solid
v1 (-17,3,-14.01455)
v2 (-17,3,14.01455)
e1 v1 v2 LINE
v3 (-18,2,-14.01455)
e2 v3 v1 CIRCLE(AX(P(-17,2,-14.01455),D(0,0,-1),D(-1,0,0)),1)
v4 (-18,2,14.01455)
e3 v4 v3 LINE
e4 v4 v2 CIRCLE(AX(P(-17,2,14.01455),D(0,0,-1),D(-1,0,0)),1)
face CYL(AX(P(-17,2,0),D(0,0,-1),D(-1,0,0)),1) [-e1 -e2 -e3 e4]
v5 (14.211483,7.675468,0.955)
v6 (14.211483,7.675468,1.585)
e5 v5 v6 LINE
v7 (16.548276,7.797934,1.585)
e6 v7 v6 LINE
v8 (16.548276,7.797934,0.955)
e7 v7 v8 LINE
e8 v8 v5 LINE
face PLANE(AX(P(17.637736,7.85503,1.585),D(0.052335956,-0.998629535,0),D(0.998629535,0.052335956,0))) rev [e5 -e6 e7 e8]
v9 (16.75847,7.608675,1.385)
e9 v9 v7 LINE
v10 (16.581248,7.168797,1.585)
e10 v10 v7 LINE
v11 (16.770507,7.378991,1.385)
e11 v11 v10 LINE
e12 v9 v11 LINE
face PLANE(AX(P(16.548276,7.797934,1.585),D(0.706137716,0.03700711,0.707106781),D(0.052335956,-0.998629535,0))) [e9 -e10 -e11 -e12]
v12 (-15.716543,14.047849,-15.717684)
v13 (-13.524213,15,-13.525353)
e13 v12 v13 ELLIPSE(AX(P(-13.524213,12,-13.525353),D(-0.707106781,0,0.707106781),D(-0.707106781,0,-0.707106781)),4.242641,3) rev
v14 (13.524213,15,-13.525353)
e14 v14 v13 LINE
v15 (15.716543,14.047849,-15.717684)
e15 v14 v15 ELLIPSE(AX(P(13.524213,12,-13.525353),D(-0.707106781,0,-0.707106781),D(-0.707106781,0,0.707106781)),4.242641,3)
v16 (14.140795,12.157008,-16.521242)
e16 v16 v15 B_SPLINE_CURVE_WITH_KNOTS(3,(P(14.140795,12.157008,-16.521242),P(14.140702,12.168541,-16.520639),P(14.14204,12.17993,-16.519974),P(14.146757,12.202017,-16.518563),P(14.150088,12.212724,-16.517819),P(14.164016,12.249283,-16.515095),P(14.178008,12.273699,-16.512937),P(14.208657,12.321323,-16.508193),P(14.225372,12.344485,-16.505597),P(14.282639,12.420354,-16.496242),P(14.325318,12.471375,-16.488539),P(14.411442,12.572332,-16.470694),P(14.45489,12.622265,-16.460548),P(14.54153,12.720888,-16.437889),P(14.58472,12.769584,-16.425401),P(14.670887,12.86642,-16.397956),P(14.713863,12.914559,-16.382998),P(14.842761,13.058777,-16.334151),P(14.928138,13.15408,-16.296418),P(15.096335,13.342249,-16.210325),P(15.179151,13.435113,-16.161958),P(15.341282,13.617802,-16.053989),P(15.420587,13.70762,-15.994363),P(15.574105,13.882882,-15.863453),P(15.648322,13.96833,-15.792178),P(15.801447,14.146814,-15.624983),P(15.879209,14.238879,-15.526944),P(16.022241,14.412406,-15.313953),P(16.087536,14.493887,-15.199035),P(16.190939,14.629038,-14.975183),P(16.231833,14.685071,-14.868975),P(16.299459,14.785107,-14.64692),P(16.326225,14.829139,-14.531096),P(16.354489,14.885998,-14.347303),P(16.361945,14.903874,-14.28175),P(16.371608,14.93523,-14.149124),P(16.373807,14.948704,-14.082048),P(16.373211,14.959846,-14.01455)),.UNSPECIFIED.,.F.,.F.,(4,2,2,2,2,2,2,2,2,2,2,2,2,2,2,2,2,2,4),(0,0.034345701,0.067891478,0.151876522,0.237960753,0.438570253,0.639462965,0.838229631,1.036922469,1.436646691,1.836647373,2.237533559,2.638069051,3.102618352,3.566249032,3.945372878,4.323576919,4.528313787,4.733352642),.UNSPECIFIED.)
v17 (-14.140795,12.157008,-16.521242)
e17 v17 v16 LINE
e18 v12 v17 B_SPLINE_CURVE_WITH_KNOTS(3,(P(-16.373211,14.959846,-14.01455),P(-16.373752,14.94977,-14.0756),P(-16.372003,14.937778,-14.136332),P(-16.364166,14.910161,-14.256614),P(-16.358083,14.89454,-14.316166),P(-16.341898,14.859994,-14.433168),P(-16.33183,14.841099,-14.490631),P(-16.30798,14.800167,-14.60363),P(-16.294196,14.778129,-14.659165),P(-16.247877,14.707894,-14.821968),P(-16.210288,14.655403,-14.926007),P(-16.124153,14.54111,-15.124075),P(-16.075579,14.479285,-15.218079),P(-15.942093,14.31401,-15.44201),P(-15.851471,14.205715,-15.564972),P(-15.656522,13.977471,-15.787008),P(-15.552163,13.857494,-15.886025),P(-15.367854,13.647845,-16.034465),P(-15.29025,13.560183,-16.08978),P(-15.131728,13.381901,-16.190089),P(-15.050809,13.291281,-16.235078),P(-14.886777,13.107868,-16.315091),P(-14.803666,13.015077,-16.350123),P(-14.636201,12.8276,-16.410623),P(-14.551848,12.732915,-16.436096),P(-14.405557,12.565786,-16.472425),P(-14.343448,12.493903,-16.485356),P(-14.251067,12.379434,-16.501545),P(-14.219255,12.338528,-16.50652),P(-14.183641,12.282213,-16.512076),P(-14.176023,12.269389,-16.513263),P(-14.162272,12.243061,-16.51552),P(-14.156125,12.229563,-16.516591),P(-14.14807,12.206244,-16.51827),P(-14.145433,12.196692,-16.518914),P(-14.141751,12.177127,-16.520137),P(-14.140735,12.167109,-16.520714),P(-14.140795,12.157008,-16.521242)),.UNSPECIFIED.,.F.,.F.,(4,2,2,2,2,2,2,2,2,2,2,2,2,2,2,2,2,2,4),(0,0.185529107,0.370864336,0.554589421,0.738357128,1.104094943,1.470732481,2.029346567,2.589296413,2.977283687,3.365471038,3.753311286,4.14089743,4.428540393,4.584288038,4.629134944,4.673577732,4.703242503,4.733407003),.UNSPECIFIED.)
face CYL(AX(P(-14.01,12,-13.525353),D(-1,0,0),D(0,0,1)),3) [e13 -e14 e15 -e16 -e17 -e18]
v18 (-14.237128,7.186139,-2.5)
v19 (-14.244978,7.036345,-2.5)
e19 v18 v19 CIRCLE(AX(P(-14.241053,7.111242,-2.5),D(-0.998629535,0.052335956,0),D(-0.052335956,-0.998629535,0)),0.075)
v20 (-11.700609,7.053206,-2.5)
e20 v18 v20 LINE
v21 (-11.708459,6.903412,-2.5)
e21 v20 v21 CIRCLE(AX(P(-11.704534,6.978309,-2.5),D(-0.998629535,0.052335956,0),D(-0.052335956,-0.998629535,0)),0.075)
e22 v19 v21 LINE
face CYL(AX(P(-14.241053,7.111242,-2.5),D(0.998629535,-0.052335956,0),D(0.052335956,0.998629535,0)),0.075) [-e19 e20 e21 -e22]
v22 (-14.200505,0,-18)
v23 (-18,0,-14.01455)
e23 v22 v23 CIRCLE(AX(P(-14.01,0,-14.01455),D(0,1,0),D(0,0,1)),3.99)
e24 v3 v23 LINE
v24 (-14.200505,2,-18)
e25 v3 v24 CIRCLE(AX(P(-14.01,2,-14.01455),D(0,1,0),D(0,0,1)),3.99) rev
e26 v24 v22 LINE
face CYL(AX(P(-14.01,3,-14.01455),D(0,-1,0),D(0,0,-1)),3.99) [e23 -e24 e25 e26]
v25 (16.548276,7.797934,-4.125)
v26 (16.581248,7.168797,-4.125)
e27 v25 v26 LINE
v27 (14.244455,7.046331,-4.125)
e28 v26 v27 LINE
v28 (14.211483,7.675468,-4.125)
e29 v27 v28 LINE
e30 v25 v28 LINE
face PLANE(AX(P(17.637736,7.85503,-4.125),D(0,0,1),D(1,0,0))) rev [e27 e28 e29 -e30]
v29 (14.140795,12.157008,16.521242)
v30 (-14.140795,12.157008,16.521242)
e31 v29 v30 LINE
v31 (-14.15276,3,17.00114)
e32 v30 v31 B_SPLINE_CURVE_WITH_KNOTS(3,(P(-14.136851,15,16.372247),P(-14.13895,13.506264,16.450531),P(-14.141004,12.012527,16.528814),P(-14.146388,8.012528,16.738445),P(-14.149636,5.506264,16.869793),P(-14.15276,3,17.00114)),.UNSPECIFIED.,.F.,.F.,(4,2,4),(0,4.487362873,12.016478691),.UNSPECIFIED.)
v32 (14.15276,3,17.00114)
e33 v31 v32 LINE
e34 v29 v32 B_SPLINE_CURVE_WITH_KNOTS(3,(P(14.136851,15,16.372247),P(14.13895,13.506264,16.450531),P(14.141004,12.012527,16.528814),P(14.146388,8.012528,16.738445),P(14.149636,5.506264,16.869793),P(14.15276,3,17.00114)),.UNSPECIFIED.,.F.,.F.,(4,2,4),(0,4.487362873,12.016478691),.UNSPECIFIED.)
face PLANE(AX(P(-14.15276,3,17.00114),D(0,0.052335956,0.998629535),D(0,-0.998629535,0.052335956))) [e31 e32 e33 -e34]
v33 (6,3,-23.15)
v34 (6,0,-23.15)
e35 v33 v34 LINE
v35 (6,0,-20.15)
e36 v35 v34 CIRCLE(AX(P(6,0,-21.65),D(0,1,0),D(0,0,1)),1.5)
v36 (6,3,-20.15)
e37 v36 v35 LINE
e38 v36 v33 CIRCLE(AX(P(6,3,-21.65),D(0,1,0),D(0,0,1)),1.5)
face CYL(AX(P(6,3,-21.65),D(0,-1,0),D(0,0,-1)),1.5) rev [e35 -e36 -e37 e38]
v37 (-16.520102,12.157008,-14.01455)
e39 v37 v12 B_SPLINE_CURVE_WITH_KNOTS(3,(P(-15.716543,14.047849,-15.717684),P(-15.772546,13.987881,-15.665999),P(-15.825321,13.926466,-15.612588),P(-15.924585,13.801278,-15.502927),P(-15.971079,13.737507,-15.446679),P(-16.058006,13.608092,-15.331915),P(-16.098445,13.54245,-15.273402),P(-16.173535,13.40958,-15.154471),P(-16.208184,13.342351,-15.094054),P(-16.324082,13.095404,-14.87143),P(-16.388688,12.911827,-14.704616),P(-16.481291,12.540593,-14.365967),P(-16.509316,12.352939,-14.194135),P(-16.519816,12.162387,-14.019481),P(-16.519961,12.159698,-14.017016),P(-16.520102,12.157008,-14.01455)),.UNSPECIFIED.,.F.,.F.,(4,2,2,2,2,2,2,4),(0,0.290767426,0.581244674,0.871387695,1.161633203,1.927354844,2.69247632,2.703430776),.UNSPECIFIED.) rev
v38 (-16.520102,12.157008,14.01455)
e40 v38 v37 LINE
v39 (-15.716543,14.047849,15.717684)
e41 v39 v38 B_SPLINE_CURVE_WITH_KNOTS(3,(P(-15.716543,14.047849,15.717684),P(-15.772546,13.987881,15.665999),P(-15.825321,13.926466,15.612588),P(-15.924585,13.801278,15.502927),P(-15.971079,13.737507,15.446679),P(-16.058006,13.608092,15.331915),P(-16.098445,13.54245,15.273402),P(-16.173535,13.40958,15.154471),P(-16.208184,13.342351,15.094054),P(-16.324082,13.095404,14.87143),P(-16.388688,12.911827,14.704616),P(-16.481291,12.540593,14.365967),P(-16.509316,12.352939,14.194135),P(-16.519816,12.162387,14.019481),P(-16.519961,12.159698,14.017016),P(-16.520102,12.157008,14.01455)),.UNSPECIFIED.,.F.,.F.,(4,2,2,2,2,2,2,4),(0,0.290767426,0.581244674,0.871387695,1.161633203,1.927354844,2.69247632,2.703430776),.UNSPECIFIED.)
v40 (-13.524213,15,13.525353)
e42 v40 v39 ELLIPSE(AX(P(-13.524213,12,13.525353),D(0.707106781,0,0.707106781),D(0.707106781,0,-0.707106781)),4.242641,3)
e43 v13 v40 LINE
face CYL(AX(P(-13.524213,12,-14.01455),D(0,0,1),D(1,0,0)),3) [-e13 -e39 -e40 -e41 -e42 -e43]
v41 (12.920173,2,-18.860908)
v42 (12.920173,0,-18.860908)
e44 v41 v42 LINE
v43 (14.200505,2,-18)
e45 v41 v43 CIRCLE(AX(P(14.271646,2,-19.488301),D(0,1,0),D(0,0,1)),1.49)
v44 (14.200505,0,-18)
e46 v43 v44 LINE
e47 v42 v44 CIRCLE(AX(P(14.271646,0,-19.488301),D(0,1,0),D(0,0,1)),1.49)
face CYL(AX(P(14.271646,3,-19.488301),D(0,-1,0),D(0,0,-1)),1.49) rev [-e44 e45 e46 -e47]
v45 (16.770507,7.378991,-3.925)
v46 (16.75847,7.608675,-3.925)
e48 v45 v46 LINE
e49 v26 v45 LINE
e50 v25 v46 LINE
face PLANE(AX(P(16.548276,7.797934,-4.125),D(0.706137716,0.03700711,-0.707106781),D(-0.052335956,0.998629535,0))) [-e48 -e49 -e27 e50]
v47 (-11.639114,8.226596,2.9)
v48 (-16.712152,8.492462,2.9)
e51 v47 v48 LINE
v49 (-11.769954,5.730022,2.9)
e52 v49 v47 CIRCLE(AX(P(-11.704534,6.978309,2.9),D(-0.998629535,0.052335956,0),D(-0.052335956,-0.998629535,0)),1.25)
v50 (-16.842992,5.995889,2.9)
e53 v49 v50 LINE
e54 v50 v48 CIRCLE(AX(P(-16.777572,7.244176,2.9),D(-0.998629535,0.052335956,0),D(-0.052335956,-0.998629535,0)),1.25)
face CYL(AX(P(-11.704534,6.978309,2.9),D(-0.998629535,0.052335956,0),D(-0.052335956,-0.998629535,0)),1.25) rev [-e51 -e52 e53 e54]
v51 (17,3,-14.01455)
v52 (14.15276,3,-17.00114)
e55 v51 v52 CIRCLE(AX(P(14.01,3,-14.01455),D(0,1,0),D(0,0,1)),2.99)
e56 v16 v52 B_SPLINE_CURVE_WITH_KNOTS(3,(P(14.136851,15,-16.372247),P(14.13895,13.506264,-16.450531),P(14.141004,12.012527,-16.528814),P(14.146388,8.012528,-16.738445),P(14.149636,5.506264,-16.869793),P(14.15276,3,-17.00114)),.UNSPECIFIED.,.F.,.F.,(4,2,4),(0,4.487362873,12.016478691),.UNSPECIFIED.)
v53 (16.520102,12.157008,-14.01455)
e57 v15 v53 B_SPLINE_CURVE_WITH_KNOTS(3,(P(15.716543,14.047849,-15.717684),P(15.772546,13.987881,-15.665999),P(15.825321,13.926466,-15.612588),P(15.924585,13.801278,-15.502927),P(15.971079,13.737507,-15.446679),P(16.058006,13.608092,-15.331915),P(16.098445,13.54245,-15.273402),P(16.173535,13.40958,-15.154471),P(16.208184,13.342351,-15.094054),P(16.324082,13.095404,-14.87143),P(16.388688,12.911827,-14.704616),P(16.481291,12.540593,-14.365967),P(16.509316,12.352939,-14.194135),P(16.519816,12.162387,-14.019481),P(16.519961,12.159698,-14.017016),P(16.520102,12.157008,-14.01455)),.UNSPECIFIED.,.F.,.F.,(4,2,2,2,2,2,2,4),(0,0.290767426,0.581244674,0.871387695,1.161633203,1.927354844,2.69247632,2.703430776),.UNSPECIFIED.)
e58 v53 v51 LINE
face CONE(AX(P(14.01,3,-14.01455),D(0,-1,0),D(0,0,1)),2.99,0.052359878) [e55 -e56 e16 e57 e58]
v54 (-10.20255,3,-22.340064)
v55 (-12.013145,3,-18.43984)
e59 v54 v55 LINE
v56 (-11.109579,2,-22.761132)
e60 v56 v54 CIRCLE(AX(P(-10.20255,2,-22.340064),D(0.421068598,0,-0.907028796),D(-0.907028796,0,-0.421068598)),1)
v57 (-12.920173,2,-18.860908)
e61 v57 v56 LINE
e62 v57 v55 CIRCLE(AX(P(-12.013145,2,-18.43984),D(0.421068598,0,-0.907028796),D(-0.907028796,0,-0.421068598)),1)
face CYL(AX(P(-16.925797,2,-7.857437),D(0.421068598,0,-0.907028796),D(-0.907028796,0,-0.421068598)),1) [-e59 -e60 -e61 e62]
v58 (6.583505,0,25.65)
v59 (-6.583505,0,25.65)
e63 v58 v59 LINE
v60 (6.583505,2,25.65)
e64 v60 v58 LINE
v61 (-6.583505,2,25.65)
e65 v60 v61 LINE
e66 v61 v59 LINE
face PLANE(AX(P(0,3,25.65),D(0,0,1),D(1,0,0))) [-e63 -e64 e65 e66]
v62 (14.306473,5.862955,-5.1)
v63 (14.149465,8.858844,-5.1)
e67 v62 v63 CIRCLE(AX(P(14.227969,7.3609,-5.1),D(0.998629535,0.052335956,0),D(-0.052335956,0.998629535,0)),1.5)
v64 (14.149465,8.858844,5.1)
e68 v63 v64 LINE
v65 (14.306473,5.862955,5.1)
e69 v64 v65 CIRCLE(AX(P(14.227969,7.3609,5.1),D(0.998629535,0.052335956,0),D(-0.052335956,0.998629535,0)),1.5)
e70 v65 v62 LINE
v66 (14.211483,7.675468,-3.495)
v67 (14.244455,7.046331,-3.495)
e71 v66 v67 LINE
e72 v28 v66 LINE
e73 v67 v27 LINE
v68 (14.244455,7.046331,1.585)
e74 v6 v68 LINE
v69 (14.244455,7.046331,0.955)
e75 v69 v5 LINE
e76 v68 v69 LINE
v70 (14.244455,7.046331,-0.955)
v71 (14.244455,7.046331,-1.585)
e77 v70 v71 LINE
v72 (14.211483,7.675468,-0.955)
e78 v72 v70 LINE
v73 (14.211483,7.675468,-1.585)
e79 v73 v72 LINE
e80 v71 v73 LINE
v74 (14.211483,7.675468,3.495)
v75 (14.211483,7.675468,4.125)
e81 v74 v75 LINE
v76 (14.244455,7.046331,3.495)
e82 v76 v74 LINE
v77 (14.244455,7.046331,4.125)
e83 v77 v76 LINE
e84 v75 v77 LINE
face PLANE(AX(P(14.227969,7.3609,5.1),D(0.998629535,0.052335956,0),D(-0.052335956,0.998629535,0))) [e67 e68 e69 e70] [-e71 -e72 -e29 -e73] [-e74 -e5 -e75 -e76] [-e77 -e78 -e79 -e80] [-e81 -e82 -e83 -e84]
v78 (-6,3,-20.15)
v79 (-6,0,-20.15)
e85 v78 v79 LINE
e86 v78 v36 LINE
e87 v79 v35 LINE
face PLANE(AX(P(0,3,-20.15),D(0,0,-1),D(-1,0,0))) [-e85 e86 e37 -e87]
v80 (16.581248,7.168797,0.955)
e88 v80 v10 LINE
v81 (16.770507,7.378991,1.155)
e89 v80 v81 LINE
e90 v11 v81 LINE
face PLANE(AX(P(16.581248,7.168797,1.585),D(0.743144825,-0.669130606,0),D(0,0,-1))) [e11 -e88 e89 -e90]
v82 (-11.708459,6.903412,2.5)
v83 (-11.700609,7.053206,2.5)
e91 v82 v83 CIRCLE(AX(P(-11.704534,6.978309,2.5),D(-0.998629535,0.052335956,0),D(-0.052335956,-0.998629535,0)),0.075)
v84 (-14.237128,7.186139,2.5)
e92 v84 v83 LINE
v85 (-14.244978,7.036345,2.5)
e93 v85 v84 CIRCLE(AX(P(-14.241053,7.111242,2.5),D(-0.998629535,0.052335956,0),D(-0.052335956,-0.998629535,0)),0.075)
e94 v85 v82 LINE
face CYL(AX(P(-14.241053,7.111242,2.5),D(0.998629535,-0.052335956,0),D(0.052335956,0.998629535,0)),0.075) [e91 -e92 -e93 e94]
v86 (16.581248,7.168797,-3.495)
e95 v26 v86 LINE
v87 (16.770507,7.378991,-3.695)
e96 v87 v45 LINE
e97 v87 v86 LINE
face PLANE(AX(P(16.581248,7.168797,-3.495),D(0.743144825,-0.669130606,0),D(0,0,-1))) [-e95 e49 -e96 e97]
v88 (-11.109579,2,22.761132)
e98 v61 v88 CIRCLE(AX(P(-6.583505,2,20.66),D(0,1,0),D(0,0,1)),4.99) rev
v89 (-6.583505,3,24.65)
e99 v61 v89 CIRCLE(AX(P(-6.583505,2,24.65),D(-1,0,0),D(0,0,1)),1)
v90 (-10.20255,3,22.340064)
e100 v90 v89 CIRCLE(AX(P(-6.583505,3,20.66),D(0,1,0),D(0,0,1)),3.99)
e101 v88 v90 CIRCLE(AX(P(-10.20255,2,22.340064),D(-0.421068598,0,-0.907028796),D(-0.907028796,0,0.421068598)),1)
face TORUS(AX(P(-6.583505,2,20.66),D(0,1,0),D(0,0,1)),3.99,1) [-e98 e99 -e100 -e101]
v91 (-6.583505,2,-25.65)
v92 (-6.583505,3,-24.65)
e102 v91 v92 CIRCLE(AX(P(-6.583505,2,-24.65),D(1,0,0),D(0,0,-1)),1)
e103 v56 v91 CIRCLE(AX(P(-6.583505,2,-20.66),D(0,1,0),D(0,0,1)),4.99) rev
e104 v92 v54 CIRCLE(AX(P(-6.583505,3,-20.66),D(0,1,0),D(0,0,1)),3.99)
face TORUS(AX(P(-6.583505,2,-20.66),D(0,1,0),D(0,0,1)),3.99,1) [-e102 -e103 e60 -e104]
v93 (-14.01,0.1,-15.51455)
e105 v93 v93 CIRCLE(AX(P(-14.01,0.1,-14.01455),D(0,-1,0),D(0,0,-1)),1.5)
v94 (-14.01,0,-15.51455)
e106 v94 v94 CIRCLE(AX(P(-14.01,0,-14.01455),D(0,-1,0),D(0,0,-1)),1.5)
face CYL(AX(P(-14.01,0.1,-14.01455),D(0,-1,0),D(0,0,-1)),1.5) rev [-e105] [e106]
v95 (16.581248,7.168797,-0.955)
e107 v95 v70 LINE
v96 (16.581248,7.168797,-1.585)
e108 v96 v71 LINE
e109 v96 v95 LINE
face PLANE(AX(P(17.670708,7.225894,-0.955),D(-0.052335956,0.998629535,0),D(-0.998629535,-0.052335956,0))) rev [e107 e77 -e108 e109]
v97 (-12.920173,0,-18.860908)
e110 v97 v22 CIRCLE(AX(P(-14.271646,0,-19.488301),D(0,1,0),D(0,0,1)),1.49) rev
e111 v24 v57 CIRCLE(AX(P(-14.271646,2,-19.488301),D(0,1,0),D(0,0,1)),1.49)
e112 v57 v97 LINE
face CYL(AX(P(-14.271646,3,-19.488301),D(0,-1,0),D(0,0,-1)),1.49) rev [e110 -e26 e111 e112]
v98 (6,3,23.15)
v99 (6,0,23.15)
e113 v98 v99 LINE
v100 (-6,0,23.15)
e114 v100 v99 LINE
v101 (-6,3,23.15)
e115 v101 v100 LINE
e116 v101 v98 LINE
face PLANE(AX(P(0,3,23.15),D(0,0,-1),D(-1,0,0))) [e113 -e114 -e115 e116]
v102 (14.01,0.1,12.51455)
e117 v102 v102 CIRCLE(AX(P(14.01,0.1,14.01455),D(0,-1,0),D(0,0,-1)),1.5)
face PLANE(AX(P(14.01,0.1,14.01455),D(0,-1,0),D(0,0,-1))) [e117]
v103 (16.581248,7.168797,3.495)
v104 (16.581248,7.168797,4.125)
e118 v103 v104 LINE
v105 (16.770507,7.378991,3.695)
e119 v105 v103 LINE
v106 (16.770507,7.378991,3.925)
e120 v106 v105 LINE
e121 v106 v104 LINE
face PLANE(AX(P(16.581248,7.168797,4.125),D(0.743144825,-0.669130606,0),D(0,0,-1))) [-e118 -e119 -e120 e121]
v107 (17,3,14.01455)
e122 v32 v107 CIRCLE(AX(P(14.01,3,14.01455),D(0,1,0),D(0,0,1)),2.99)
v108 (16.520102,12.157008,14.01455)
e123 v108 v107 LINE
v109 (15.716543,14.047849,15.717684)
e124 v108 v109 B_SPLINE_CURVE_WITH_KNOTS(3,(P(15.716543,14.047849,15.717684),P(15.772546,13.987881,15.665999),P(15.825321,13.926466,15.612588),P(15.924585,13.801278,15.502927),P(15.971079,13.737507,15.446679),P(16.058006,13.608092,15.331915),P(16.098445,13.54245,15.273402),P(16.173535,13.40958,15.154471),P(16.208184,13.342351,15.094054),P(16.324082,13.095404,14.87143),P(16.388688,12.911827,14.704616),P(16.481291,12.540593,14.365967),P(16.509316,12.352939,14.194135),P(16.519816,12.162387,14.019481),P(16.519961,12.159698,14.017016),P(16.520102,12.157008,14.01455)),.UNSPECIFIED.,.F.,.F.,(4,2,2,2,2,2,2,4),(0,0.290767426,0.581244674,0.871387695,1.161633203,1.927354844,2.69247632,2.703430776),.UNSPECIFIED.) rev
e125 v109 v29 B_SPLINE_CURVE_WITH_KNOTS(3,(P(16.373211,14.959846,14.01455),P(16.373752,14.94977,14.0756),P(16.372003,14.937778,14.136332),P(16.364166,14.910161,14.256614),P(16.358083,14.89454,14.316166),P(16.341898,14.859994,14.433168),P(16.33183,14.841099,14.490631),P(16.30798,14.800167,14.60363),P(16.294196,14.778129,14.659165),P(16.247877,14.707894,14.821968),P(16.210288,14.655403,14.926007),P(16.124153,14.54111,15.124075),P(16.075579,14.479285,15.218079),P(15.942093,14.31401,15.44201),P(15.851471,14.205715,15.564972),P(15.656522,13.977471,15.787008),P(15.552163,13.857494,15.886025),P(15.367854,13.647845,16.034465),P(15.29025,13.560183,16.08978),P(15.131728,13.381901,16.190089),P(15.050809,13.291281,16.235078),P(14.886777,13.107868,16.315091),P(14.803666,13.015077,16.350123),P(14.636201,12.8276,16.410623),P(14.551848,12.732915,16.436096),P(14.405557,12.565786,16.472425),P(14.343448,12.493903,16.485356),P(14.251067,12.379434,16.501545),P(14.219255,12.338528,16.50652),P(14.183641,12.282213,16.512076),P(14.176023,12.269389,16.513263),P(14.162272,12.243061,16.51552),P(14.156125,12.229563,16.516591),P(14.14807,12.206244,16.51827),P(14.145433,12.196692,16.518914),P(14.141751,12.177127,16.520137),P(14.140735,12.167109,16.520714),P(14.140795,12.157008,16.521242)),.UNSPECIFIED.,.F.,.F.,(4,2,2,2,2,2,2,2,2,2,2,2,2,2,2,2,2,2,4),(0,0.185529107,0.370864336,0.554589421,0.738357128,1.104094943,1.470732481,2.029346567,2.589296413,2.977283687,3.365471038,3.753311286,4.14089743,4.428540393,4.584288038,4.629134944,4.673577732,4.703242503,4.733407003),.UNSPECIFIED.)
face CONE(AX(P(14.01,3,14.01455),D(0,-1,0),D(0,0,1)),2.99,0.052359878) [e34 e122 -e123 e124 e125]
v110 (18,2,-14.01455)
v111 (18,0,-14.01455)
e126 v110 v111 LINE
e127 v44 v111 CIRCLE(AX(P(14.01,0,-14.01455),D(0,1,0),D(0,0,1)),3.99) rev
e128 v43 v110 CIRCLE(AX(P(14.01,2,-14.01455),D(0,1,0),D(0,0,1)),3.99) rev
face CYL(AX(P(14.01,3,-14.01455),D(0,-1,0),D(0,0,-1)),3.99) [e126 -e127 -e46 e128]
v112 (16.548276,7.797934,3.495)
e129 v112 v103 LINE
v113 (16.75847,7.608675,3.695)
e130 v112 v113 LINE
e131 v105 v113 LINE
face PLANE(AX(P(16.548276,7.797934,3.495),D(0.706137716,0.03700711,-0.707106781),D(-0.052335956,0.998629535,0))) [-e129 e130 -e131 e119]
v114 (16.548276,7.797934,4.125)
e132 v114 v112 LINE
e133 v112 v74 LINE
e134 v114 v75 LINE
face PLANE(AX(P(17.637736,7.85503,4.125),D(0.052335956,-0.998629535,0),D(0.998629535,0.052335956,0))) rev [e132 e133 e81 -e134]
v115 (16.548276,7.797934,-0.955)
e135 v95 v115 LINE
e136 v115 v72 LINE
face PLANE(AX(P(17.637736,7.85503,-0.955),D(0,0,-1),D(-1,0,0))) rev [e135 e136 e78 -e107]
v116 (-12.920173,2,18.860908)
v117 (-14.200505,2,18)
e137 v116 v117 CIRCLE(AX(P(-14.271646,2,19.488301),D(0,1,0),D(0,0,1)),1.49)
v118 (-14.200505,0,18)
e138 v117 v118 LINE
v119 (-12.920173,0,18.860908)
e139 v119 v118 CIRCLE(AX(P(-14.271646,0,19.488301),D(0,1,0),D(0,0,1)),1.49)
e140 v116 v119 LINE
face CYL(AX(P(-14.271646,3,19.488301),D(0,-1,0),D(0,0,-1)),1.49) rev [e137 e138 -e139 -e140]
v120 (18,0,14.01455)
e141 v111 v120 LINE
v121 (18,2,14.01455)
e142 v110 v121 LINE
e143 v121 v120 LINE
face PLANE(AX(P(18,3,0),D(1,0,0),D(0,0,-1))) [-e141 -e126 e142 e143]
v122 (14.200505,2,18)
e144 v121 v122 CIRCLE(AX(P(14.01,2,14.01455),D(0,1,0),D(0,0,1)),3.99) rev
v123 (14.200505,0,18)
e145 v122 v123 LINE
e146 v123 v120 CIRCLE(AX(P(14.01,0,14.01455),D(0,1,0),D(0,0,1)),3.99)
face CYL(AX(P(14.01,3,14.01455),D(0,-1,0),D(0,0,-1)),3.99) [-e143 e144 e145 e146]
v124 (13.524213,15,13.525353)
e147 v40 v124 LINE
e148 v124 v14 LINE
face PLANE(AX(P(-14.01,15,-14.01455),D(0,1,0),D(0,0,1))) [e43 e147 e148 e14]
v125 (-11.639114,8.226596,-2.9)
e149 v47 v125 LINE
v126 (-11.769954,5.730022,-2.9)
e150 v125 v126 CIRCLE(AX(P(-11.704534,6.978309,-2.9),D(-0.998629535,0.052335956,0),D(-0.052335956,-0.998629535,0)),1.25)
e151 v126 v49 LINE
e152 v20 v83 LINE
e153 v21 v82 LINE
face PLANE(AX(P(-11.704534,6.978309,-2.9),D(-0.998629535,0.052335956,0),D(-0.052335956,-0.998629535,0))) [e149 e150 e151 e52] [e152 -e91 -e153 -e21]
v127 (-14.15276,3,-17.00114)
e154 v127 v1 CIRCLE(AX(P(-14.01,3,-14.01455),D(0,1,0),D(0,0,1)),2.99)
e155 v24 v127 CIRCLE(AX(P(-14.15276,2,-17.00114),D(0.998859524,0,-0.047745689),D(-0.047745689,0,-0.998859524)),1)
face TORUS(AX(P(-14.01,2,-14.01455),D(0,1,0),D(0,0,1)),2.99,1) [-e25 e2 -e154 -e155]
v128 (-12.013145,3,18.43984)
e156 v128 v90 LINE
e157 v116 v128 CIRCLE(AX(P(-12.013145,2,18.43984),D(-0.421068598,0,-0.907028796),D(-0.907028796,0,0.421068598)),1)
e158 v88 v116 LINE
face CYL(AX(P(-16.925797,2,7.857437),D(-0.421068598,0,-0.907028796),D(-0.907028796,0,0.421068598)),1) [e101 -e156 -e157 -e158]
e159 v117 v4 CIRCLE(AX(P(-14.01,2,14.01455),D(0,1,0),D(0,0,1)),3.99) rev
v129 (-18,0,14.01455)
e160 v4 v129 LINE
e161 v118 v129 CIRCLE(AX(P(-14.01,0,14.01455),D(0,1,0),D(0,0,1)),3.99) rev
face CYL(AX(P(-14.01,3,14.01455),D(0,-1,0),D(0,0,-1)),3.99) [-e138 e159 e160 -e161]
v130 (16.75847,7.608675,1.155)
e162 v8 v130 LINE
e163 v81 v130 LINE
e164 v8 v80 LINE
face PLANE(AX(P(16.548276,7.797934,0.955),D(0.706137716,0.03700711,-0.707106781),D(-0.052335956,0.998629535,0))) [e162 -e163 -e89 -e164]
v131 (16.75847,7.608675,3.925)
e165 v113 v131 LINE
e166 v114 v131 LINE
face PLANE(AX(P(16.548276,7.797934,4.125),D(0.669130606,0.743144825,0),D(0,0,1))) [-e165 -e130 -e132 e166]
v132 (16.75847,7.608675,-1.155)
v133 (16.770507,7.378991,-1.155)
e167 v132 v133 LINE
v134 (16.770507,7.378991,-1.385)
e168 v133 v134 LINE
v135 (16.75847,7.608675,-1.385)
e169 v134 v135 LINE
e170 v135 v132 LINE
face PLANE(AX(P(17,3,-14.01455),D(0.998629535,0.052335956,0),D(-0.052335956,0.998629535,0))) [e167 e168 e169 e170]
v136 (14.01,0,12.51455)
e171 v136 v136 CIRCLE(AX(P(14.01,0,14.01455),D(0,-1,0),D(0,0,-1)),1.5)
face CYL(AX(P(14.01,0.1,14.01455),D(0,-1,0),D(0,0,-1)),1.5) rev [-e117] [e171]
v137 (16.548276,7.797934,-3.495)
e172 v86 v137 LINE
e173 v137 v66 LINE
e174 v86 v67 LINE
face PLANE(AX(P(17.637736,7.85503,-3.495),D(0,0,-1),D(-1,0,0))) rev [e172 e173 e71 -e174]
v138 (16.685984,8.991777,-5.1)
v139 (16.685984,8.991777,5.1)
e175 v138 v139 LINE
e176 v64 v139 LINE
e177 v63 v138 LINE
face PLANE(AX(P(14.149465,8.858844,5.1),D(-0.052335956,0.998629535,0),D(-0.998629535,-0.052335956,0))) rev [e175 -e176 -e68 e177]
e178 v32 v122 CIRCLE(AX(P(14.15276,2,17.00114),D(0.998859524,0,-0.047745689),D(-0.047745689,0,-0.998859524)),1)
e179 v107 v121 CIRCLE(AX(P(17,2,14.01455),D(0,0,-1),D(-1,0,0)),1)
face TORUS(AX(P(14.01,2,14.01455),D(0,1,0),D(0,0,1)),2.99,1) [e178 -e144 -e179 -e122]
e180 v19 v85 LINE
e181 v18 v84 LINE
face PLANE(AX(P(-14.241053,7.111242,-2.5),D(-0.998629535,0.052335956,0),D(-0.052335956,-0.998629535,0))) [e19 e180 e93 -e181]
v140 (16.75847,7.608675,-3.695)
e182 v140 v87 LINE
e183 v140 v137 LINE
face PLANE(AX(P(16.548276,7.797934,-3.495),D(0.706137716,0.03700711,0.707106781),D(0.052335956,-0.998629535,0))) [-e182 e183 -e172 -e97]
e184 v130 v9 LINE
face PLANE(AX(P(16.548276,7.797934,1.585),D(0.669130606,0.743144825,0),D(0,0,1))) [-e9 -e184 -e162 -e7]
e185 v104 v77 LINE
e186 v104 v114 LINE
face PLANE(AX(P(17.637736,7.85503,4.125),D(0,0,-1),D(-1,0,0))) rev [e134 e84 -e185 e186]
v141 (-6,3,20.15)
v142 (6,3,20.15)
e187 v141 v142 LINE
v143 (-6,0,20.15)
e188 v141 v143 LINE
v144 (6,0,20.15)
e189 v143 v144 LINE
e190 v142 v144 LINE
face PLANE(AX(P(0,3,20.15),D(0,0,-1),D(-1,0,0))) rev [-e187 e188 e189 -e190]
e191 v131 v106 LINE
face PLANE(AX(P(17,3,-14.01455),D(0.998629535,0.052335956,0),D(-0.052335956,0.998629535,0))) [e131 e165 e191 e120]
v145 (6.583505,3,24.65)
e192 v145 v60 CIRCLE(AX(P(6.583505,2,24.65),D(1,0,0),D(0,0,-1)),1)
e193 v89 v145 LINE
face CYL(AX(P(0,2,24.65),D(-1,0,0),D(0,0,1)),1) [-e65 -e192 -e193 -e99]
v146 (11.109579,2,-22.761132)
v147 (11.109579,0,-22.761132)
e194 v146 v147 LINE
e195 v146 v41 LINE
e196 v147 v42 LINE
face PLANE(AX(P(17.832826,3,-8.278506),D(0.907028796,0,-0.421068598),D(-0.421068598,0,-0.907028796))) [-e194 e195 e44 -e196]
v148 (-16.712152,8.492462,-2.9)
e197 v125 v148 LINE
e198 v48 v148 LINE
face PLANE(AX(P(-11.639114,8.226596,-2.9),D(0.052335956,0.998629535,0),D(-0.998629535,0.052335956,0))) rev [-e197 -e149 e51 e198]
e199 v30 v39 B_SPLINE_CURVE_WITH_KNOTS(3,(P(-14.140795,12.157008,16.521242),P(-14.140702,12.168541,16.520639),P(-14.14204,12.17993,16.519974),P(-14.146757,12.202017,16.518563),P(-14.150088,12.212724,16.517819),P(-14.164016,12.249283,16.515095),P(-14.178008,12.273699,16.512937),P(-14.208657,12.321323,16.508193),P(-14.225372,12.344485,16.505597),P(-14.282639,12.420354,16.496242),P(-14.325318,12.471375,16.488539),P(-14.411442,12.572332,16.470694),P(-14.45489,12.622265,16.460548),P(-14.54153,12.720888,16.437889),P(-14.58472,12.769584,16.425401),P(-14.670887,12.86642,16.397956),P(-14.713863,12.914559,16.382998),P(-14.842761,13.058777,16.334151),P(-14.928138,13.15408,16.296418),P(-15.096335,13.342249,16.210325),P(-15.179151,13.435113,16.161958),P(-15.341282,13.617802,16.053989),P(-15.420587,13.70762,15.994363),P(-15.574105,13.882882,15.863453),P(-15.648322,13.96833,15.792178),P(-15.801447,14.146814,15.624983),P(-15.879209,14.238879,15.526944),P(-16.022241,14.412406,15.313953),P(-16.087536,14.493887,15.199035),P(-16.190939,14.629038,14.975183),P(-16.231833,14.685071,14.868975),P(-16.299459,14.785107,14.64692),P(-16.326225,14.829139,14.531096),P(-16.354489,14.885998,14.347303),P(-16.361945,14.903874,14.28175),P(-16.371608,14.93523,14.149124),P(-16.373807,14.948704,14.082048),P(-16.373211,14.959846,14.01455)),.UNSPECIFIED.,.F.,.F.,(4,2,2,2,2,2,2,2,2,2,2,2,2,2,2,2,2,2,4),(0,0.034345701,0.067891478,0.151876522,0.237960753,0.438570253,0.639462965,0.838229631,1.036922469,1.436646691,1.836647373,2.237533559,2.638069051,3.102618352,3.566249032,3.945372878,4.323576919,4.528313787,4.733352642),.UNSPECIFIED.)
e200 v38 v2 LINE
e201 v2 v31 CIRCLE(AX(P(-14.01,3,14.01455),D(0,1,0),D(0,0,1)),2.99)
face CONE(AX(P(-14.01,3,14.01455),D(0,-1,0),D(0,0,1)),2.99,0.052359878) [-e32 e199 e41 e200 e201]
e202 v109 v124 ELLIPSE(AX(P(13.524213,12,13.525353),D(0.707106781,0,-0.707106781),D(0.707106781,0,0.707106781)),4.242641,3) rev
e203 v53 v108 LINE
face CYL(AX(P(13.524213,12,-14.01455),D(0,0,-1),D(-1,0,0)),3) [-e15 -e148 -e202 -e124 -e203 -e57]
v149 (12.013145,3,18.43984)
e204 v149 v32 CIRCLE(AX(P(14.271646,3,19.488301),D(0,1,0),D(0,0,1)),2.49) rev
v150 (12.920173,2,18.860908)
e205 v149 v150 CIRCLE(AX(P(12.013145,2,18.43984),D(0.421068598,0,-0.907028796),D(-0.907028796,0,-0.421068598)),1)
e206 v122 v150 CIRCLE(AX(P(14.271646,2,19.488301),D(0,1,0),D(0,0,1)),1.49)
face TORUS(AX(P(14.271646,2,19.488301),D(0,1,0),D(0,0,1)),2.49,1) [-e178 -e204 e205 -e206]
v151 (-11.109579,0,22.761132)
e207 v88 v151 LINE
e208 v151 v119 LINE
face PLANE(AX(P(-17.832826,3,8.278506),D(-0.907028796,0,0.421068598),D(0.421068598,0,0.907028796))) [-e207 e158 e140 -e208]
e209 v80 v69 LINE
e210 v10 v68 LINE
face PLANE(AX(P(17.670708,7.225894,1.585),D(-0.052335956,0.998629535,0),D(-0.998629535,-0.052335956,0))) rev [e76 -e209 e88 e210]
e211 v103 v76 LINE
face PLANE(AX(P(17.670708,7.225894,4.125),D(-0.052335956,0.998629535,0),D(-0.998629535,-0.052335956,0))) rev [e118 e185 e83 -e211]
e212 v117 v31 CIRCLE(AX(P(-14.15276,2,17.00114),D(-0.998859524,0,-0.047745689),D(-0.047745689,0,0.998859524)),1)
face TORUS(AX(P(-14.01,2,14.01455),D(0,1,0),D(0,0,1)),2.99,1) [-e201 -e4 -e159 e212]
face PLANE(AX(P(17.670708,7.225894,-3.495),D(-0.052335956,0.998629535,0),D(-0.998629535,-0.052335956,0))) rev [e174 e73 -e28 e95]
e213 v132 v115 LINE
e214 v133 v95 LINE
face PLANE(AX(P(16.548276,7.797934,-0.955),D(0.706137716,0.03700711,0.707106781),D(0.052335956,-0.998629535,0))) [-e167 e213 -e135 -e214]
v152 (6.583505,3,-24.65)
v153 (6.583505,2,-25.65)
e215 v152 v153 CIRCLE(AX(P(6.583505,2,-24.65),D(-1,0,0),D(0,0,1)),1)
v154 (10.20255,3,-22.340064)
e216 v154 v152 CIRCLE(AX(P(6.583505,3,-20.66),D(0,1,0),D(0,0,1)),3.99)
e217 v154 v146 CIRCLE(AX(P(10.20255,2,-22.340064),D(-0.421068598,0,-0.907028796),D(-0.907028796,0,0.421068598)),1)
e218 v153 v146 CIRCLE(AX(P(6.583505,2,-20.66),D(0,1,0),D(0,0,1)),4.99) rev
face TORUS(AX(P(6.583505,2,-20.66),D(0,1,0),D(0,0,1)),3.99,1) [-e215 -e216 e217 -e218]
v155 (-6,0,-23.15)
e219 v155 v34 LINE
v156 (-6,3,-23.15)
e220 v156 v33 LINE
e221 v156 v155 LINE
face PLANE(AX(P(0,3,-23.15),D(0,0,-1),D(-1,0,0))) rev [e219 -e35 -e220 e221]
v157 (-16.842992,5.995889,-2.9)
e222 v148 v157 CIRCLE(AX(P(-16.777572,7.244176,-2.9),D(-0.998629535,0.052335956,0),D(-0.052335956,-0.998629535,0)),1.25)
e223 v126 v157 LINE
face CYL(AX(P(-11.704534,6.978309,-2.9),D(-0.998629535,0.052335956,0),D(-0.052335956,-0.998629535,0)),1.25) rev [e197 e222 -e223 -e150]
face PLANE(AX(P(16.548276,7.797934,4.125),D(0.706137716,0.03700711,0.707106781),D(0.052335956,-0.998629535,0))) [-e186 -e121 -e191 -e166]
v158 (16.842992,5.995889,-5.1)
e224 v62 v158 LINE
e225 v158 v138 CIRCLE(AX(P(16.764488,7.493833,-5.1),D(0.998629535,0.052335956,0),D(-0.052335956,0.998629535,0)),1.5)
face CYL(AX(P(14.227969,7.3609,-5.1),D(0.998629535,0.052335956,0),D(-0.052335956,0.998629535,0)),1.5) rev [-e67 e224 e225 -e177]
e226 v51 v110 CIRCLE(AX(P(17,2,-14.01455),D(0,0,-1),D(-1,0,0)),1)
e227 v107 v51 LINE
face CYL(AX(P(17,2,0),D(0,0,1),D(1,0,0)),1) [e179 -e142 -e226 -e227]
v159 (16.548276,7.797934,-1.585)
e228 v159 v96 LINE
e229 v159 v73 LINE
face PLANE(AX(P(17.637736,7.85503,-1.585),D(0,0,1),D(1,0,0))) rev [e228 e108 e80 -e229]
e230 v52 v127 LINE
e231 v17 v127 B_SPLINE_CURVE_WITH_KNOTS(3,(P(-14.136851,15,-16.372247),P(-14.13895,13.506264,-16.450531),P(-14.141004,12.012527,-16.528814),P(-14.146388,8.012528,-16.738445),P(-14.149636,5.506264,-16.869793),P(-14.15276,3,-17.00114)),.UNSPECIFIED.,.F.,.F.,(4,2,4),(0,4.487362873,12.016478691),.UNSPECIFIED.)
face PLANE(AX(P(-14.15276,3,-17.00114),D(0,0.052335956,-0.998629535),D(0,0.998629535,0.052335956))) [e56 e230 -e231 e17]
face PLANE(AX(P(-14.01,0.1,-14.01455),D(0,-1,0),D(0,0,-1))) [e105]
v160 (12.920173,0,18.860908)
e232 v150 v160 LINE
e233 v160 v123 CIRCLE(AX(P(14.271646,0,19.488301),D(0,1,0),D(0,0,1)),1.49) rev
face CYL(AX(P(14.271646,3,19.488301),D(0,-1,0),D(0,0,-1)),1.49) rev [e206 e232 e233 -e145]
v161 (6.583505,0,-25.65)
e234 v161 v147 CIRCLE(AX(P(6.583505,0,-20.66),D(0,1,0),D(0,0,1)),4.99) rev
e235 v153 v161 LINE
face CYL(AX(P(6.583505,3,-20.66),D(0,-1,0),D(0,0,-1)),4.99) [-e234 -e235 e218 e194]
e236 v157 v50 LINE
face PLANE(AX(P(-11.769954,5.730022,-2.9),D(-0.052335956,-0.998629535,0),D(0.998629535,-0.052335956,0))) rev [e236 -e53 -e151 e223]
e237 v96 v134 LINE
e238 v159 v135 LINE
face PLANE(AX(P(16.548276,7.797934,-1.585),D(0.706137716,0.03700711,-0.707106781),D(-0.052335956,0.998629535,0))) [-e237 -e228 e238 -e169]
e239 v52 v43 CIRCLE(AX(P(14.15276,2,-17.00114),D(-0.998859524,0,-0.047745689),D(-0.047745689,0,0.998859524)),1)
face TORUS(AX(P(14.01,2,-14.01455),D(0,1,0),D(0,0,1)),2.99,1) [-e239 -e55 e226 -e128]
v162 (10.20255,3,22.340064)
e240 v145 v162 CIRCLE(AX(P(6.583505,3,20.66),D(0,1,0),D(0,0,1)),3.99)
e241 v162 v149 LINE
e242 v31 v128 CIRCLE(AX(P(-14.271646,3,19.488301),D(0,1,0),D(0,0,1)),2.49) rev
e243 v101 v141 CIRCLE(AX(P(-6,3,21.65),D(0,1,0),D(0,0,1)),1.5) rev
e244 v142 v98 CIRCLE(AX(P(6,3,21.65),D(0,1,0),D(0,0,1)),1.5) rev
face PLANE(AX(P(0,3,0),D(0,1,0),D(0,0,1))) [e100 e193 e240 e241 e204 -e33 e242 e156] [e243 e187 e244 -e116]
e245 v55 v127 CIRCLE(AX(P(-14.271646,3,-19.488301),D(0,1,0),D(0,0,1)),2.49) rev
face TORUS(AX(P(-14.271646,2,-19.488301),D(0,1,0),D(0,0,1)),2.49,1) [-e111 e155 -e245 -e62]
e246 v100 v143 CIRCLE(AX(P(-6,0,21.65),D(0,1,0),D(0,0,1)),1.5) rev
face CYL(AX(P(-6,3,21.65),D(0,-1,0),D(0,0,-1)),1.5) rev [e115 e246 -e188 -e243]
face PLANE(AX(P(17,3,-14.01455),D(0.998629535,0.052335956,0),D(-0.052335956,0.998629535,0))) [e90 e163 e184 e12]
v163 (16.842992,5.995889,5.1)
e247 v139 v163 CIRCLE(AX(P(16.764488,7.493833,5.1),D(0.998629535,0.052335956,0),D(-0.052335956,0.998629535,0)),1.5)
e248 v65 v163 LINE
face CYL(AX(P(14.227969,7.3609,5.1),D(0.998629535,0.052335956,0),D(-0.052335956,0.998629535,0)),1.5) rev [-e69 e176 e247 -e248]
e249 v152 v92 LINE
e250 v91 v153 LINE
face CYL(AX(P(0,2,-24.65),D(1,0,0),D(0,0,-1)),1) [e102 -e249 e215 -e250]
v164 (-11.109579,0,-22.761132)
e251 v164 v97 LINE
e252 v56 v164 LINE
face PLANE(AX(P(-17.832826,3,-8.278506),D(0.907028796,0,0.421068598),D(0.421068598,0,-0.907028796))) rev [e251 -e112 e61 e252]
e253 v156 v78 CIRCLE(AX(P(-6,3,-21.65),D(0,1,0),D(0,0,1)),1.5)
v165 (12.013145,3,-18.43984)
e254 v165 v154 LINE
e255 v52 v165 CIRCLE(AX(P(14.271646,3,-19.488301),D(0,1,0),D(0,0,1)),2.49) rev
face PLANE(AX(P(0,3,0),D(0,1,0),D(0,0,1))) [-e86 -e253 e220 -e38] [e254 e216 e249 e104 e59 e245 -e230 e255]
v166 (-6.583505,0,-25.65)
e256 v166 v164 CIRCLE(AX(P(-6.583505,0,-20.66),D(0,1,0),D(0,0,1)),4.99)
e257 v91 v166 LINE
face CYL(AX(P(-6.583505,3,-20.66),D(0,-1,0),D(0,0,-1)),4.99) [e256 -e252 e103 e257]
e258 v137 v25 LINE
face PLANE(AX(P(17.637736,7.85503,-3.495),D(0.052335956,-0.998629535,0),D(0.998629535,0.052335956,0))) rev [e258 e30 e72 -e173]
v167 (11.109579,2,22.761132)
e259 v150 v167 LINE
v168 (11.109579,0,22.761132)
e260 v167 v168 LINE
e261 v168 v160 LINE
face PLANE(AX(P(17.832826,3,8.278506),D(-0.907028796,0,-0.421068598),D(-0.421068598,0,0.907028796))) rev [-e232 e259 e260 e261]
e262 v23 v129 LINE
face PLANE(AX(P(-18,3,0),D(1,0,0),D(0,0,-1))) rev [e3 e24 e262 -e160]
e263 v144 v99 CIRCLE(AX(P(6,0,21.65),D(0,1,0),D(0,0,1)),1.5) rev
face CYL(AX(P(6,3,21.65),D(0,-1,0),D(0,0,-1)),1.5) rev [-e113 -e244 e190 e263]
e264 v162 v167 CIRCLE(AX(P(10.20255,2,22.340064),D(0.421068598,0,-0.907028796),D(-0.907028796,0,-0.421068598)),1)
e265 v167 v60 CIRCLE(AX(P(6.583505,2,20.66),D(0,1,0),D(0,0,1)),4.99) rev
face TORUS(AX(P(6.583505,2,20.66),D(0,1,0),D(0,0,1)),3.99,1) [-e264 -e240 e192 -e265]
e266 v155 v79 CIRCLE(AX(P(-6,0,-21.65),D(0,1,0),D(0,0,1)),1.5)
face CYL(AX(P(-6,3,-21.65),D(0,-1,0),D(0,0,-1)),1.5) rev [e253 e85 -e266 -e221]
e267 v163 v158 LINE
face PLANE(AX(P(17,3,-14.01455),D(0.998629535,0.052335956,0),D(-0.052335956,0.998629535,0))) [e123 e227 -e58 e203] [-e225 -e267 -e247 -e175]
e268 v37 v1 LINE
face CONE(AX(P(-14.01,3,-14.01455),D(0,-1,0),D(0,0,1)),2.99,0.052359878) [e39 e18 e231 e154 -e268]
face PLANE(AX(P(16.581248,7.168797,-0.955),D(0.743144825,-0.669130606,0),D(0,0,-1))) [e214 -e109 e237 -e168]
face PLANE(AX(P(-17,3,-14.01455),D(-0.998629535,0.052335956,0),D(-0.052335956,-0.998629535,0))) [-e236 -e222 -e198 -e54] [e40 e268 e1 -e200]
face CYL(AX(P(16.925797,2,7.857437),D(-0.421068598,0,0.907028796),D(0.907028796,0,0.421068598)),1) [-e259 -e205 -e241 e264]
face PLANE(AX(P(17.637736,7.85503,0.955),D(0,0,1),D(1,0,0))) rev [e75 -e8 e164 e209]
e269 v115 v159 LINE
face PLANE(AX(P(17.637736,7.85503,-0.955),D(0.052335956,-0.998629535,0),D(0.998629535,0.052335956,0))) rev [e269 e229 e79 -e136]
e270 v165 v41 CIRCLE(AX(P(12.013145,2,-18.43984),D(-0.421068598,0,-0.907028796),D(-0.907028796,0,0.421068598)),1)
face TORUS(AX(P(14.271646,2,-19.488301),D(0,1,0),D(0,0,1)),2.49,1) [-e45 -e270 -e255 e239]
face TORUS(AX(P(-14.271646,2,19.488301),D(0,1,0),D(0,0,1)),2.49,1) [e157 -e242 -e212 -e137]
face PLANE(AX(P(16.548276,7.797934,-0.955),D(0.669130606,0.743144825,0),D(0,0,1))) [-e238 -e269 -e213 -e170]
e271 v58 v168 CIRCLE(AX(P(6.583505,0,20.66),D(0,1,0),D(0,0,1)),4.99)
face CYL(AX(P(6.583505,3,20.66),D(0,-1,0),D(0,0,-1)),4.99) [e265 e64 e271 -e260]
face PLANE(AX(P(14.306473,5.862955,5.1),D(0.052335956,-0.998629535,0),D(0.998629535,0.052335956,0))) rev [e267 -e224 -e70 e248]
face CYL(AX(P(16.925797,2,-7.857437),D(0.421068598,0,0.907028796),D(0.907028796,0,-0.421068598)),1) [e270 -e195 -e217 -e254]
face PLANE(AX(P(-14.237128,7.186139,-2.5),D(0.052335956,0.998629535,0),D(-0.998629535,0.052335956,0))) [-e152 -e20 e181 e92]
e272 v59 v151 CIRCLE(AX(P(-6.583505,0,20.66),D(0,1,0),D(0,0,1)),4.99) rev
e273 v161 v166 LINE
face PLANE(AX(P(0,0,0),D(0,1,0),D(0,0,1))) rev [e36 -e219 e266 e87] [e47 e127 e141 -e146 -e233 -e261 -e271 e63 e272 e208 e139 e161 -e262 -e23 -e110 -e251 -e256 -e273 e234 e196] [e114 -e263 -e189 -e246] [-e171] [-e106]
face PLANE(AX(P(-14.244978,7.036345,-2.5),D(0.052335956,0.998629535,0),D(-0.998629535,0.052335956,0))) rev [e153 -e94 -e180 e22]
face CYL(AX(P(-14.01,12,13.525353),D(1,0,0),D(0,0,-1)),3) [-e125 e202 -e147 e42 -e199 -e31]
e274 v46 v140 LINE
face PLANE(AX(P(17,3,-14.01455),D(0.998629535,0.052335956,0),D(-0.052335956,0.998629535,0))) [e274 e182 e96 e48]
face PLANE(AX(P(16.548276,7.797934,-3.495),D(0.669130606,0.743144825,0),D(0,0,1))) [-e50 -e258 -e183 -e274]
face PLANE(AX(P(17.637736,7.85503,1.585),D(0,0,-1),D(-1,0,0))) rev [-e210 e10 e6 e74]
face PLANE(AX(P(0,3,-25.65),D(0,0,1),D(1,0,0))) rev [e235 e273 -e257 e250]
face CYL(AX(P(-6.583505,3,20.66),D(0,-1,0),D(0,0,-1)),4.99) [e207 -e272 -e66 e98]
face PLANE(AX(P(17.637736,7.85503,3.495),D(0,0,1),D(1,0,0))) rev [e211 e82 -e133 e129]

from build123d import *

# Parameters (mm, degrees)
EXTRUDE_1_DEPTH     = 3
FILLET_1_R          = 1
EXTRUDE_2_DEPTH     = 12
EXTRUDE_2_TAPER     = 3
FILLET_3_R          = 3
FILLET_4_R          = 3
CUT_EXTRUDE_1_DEPTH = 2.54
SKETCH_5_W          = 0.63
SKETCH_5_H          = 0.63
EXTRUDE_3_DEPTH     = 2.54
CHAMFER_2_SIZE      = 0.2
CHAMFER_3_SIZE      = 0.2
CUT_EXTRUDE_2_DEPTH = 5.08
EXTRUDE_4_DEPTH     = 2.54
SKETCH_8_R          = 1.5
CUT_EXTRUDE_3_DEPTH = 0.1


with BuildPart() as part:
    # 草图1 → 凸台-拉伸1 (new body)
    with BuildSketch(Plane(origin=(0, 0, 0), x_dir=(1, 0, 0), z_dir=(0, 1, 0))):
        with BuildLine():
            ThreePointArc((11.109578501, 22.761132302), (9.268225449, 24.866230509), (6.58350481, 25.65))
            Line((6.58350481, 25.65), (-6.58350481, 25.65))
            ThreePointArc((-6.58350481, 25.65), (-9.268225449, 24.866230509), (-11.109578501, 22.761132302))
            Line((-11.109578501, 22.761132302), (-12.92017347, 18.860908481))
            ThreePointArc((-12.92017347, 18.860908481), (-13.440232827, 18.25183334), (-14.200505299, 18))
            ThreePointArc((-14.200505299, 18), (-16.897924527, 16.767729012), (-18, 14.014550498))
            Line((-18, 14.014550498), (-18, 13.985449502))
            Line((-18, 13.985449502), (-18, -13.985449502))
            Line((-18, -13.985449502), (-18, -14.014550498))
            ThreePointArc((-18, -14.014550498), (-16.897924527, -16.767729012), (-14.200505299, -18))
            ThreePointArc((-14.200505299, -18), (-13.440232827, -18.25183334), (-12.92017347, -18.860908481))
            Line((-12.92017347, -18.860908481), (-11.109578501, -22.761132302))
            ThreePointArc((-11.109578501, -22.761132302), (-9.268225449, -24.866230509), (-6.58350481, -25.65))
            Line((-6.58350481, -25.65), (6.58350481, -25.65))
            ThreePointArc((6.58350481, -25.65), (9.268225449, -24.866230509), (11.109578501, -22.761132302))
            Line((11.109578501, -22.761132302), (12.92017347, -18.860908481))
            ThreePointArc((12.92017347, -18.860908481), (13.440232827, -18.25183334), (14.200505299, -18))
            ThreePointArc((14.200505299, -18), (16.897924527, -16.767729012), (18, -14.014550498))
            Line((18, -14.014550498), (18, 14.014550498))
            ThreePointArc((18, 14.014550498), (16.897924527, 16.767729012), (14.200505299, 18))
            ThreePointArc((14.200505299, 18), (13.440232827, 18.25183334), (12.92017347, 18.860908481))
            Line((12.92017347, 18.860908481), (11.109578501, 22.761132302))
        make_face()
        with BuildLine():
            Line((6, -23.15), (-6, -23.15))
            ThreePointArc((-6, -23.15), (-7.5, -21.65), (-6, -20.15))
            Line((-6, -20.15), (6, -20.15))
            ThreePointArc((6, -20.15), (7.5, -21.65), (6, -23.15))
        make_face(mode=Mode.SUBTRACT)
        with BuildLine():
            ThreePointArc((-6, 20.15), (-7.5, 21.65), (-6, 23.15))
            Line((-6, 23.15), (6, 23.15))
            ThreePointArc((6, 23.15), (7.5, 21.65), (6, 20.15))
            Line((6, 20.15), (-6, 20.15))
        make_face(mode=Mode.SUBTRACT)
    extrude(amount=EXTRUDE_1_DEPTH)

    # 圆角1
    fillet_1_edges = [part.edges().sort_by_distance(p)[0] for p in [
        (-12.014875986, 3, 20.811020391),
        (-9.268225449, 3, 24.866230509),
        (0, 3, 25.65),
        (9.268225449, 3, 24.866230509),
        (12.014875986, 3, 20.811020391),
        (13.440232827, 3, 18.25183334),
        (16.897924527, 3, 16.767729012),
        (18, 3, 0),
        (16.897924527, 3, -16.767729012),
        (13.440232827, 3, -18.25183334),
        (12.014875986, 3, -20.811020391),
        (9.268225449, 3, -24.866230509),
        (0, 3, -25.65),
        (-9.268225449, 3, -24.866230509),
        (-12.014875986, 3, -20.811020391),
        (-13.440232827, 3, -18.25183334),
        (-16.897924527, 3, -16.767729012),
        (-18, 3, 0),
        (-16.897924527, 3, 16.767729012),
        (-13.440232827, 3, 18.25183334),
    ]]
    fillet(fillet_1_edges, radius=FILLET_1_R)

    # 草图2 → 凸台-拉伸2 (add)
    with BuildSketch(Plane(origin=(0, 3, 0), x_dir=(1, 0, 0), z_dir=(0, 1, 0))):
        with BuildLine():
            ThreePointArc((-14.15275961, 17.001140476), (-16.174133919, 16.077709334), (-17, 14.014550498))
            Line((-17, 14.014550498), (-17, -14.014550498))
            ThreePointArc((-17, -14.014550498), (-16.174133919, -16.077709334), (-14.15275961, -17.001140476))
            Line((-14.15275961, -17.001140476), (14.15275961, -17.001140476))
            ThreePointArc((14.15275961, -17.001140476), (16.174133919, -16.077709334), (17, -14.014550498))
            Line((17, -14.014550498), (17, 14.014550498))
            ThreePointArc((17, 14.014550498), (16.174133919, 16.077709334), (14.15275961, 17.001140476))
            Line((14.15275961, 17.001140476), (-14.15275961, 17.001140476))
        make_face()
    extrude(amount=EXTRUDE_2_DEPTH, taper=EXTRUDE_2_TAPER)

    # 圆角3
    # the kernel refuses this fillet: 3 mm, written as the material it takes off along each edge
    with BuildSketch(Plane(origin=(-21.254085444, 15, 16.372247124), x_dir=(0, 0, -1), z_dir=(1, 0, 0))) as fillet_3_piece_1:
        with BuildLine():
            CenterArc((FILLET_3_R * 0.948964566715, -FILLET_3_R), FILLET_3_R, 90, 87)
            Line((-FILLET_3_R * 0.0496649680397, -FILLET_3_R * 0.947664043757), (0, 0))
            Line((0, 0), (FILLET_3_R * 0.948964566715, 0))
        make_face()
    extrude(amount=42.508170888, mode=Mode.SUBTRACT)
    with BuildSketch(Plane(origin=(21.254085444, 15, -16.372247124), x_dir=(0, -0.9986295347545739, -0.05233595624294369), z_dir=(-1, 0, 0))) as fillet_3_piece_2:
        with BuildLine():
            CenterArc((FILLET_3_R * 0.948964566715, FILLET_3_R), FILLET_3_R, 183, 87)
            Line((-FILLET_3_R * 0.0496649680397, FILLET_3_R * 0.947664043757), (0, 0))
            Line((0, 0), (FILLET_3_R * 0.948964566715, 0))
        make_face()
    extrude(amount=42.508170888, mode=Mode.SUBTRACT)

    # 圆角4
    # the kernel refuses this fillet: 3 mm, written as the material it takes off along each edge
    with BuildSketch(Plane(origin=(-16.371106649, 15, -20.642587675), x_dir=(-0.052335956242944966, -0.9986295347545738, 0), z_dir=(0, 0, 1)), Plane(origin=(16.371106649, 15, 20.642587675), x_dir=(0.05233595624294368, -0.9986295347545738, 0), z_dir=(0, 0, -1))) as fillet_4_piece_1:
        with BuildLine():
            CenterArc((FILLET_4_R * 0.948964566715, FILLET_4_R), FILLET_4_R, 183, 87)
            Line((-FILLET_4_R * 0.0496649680397, FILLET_4_R * 0.947664043757), (0, 0))
            Line((0, 0), (FILLET_4_R * 0.948964566715, 0))
        make_face()
    extrude(amount=41.285175349, mode=Mode.SUBTRACT)

    # 草图4 → 切除-拉伸1 (cut)
    with BuildSketch(Plane(origin=(17.110228806, 0.896709095, 0), x_dir=(0, 0, -1), z_dir=(0.998629534754574, 0.05233595624294391, 0))):
        with BuildLine():
            Line((-5.1, 8.106177348), (5.1, 8.106177348))
            ThreePointArc((5.1, 8.106177348), (6.6, 6.606177348), (5.1, 5.106177348))
            Line((5.1, 5.106177348), (-5.1, 5.106177348))
            ThreePointArc((-5.1, 5.106177348), (-6.6, 6.606177348), (-5.1, 8.106177348))
        make_face()
    extrude(amount=-CUT_EXTRUDE_1_DEPTH, mode=Mode.SUBTRACT)

    # 草图5 → 凸台-拉伸3 (add)
    with BuildSketch(Plane(origin=(14.573709787, 0.763775766, 0), x_dir=(0, 0, -1), z_dir=(0.998629534754574, 0.05233595624294393, 0))):
        with Locations((-1.27, 6.606177348)):
            Rectangle(SKETCH_5_W, SKETCH_5_H)
        with Locations((-3.81, 6.606177348)):
            Rectangle(SKETCH_5_W, SKETCH_5_H)
        with Locations((1.27, 6.606177348)):
            Rectangle(SKETCH_5_W, SKETCH_5_H)
        with Locations((3.81, 6.606177348)):
            Rectangle(SKETCH_5_W, SKETCH_5_H)
    extrude(amount=EXTRUDE_3_DEPTH)

    # 倒角2
    chamfer_2_edges = [part.edges().sort_by_distance(p)[0] for p in [
        (16.780974023, 7.179264603, 3.81),
        (16.764488197, 7.493832906, 4.125),
        (16.748002371, 7.80840121, 3.81),
        (16.764488197, 7.493832906, 3.495),
    ]]
    chamfer(chamfer_2_edges, length=CHAMFER_2_SIZE)

    # 倒角3
    chamfer_3_edges = [part.edges().sort_by_distance(p)[0] for p in [
        (16.764488197, 7.493832906, 1.585),
        (16.748002371, 7.80840121, 1.27),
        (16.764488197, 7.493832906, 0.955),
        (16.780974023, 7.179264603, 1.27),
        (16.764488197, 7.493832906, -0.955),
        (16.748002371, 7.80840121, -1.27),
        (16.764488197, 7.493832906, -1.585),
        (16.780974023, 7.179264603, -1.27),
        (16.764488197, 7.493832906, -3.495),
        (16.748002371, 7.80840121, -3.81),
        (16.764488197, 7.493832906, -4.125),
        (16.780974023, 7.179264603, -3.81),
    ]]
    chamfer(chamfer_3_edges, length=CHAMFER_3_SIZE)

    # 草图6 → 切除-拉伸2 (cut)
    with BuildSketch(Plane(origin=(-17.110228806, 0.896709095, 0), x_dir=(0, 0, 1), z_dir=(-0.998629534754574, 0.05233595624294391, -1.6069369669372317e-15))):
        with BuildLine():
            Line((-2.9, 7.606177348), (2.9, 7.606177348))
            ThreePointArc((2.9, 7.606177348), (4.15, 6.356177348), (2.9, 5.106177348))
            Line((2.9, 5.106177348), (-2.9, 5.106177348))
            ThreePointArc((-2.9, 5.106177348), (-4.15, 6.356177348), (-2.9, 7.606177348))
        make_face()
    extrude(amount=-CUT_EXTRUDE_2_DEPTH, mode=Mode.SUBTRACT)

    # 草图7 → 凸台-拉伸4 (add)
    with BuildSketch(Plane(origin=(-12.037190769, 0.630842437, 0), x_dir=(0, 0, 1), z_dir=(-0.998629534754574, 0.05233595624294393, -1.6069369669372323e-15))):
        with BuildLine():
            Line((-2.5, 6.431177348), (2.5, 6.431177348))
            ThreePointArc((2.5, 6.431177348), (2.575, 6.356177348), (2.5, 6.281177348))
            Line((2.5, 6.281177348), (-2.5, 6.281177348))
            ThreePointArc((-2.5, 6.281177348), (-2.575, 6.356177348), (-2.5, 6.431177348))
        make_face()
    extrude(amount=EXTRUDE_4_DEPTH)

    # 草图8 → 切除-拉伸3 (cut)
    with BuildSketch(Plane.XZ):
        with Locations(Location((14.01, 14.014550498, 0), (0, 0, 270))):
            Circle(SKETCH_8_R)
        with Locations(Location((-14.01, -14.014550498, 0), (0, 0, 270))):
            Circle(SKETCH_8_R)
    extrude(amount=-CUT_EXTRUDE_3_DEPTH, mode=Mode.SUBTRACT)


solid = part.part
